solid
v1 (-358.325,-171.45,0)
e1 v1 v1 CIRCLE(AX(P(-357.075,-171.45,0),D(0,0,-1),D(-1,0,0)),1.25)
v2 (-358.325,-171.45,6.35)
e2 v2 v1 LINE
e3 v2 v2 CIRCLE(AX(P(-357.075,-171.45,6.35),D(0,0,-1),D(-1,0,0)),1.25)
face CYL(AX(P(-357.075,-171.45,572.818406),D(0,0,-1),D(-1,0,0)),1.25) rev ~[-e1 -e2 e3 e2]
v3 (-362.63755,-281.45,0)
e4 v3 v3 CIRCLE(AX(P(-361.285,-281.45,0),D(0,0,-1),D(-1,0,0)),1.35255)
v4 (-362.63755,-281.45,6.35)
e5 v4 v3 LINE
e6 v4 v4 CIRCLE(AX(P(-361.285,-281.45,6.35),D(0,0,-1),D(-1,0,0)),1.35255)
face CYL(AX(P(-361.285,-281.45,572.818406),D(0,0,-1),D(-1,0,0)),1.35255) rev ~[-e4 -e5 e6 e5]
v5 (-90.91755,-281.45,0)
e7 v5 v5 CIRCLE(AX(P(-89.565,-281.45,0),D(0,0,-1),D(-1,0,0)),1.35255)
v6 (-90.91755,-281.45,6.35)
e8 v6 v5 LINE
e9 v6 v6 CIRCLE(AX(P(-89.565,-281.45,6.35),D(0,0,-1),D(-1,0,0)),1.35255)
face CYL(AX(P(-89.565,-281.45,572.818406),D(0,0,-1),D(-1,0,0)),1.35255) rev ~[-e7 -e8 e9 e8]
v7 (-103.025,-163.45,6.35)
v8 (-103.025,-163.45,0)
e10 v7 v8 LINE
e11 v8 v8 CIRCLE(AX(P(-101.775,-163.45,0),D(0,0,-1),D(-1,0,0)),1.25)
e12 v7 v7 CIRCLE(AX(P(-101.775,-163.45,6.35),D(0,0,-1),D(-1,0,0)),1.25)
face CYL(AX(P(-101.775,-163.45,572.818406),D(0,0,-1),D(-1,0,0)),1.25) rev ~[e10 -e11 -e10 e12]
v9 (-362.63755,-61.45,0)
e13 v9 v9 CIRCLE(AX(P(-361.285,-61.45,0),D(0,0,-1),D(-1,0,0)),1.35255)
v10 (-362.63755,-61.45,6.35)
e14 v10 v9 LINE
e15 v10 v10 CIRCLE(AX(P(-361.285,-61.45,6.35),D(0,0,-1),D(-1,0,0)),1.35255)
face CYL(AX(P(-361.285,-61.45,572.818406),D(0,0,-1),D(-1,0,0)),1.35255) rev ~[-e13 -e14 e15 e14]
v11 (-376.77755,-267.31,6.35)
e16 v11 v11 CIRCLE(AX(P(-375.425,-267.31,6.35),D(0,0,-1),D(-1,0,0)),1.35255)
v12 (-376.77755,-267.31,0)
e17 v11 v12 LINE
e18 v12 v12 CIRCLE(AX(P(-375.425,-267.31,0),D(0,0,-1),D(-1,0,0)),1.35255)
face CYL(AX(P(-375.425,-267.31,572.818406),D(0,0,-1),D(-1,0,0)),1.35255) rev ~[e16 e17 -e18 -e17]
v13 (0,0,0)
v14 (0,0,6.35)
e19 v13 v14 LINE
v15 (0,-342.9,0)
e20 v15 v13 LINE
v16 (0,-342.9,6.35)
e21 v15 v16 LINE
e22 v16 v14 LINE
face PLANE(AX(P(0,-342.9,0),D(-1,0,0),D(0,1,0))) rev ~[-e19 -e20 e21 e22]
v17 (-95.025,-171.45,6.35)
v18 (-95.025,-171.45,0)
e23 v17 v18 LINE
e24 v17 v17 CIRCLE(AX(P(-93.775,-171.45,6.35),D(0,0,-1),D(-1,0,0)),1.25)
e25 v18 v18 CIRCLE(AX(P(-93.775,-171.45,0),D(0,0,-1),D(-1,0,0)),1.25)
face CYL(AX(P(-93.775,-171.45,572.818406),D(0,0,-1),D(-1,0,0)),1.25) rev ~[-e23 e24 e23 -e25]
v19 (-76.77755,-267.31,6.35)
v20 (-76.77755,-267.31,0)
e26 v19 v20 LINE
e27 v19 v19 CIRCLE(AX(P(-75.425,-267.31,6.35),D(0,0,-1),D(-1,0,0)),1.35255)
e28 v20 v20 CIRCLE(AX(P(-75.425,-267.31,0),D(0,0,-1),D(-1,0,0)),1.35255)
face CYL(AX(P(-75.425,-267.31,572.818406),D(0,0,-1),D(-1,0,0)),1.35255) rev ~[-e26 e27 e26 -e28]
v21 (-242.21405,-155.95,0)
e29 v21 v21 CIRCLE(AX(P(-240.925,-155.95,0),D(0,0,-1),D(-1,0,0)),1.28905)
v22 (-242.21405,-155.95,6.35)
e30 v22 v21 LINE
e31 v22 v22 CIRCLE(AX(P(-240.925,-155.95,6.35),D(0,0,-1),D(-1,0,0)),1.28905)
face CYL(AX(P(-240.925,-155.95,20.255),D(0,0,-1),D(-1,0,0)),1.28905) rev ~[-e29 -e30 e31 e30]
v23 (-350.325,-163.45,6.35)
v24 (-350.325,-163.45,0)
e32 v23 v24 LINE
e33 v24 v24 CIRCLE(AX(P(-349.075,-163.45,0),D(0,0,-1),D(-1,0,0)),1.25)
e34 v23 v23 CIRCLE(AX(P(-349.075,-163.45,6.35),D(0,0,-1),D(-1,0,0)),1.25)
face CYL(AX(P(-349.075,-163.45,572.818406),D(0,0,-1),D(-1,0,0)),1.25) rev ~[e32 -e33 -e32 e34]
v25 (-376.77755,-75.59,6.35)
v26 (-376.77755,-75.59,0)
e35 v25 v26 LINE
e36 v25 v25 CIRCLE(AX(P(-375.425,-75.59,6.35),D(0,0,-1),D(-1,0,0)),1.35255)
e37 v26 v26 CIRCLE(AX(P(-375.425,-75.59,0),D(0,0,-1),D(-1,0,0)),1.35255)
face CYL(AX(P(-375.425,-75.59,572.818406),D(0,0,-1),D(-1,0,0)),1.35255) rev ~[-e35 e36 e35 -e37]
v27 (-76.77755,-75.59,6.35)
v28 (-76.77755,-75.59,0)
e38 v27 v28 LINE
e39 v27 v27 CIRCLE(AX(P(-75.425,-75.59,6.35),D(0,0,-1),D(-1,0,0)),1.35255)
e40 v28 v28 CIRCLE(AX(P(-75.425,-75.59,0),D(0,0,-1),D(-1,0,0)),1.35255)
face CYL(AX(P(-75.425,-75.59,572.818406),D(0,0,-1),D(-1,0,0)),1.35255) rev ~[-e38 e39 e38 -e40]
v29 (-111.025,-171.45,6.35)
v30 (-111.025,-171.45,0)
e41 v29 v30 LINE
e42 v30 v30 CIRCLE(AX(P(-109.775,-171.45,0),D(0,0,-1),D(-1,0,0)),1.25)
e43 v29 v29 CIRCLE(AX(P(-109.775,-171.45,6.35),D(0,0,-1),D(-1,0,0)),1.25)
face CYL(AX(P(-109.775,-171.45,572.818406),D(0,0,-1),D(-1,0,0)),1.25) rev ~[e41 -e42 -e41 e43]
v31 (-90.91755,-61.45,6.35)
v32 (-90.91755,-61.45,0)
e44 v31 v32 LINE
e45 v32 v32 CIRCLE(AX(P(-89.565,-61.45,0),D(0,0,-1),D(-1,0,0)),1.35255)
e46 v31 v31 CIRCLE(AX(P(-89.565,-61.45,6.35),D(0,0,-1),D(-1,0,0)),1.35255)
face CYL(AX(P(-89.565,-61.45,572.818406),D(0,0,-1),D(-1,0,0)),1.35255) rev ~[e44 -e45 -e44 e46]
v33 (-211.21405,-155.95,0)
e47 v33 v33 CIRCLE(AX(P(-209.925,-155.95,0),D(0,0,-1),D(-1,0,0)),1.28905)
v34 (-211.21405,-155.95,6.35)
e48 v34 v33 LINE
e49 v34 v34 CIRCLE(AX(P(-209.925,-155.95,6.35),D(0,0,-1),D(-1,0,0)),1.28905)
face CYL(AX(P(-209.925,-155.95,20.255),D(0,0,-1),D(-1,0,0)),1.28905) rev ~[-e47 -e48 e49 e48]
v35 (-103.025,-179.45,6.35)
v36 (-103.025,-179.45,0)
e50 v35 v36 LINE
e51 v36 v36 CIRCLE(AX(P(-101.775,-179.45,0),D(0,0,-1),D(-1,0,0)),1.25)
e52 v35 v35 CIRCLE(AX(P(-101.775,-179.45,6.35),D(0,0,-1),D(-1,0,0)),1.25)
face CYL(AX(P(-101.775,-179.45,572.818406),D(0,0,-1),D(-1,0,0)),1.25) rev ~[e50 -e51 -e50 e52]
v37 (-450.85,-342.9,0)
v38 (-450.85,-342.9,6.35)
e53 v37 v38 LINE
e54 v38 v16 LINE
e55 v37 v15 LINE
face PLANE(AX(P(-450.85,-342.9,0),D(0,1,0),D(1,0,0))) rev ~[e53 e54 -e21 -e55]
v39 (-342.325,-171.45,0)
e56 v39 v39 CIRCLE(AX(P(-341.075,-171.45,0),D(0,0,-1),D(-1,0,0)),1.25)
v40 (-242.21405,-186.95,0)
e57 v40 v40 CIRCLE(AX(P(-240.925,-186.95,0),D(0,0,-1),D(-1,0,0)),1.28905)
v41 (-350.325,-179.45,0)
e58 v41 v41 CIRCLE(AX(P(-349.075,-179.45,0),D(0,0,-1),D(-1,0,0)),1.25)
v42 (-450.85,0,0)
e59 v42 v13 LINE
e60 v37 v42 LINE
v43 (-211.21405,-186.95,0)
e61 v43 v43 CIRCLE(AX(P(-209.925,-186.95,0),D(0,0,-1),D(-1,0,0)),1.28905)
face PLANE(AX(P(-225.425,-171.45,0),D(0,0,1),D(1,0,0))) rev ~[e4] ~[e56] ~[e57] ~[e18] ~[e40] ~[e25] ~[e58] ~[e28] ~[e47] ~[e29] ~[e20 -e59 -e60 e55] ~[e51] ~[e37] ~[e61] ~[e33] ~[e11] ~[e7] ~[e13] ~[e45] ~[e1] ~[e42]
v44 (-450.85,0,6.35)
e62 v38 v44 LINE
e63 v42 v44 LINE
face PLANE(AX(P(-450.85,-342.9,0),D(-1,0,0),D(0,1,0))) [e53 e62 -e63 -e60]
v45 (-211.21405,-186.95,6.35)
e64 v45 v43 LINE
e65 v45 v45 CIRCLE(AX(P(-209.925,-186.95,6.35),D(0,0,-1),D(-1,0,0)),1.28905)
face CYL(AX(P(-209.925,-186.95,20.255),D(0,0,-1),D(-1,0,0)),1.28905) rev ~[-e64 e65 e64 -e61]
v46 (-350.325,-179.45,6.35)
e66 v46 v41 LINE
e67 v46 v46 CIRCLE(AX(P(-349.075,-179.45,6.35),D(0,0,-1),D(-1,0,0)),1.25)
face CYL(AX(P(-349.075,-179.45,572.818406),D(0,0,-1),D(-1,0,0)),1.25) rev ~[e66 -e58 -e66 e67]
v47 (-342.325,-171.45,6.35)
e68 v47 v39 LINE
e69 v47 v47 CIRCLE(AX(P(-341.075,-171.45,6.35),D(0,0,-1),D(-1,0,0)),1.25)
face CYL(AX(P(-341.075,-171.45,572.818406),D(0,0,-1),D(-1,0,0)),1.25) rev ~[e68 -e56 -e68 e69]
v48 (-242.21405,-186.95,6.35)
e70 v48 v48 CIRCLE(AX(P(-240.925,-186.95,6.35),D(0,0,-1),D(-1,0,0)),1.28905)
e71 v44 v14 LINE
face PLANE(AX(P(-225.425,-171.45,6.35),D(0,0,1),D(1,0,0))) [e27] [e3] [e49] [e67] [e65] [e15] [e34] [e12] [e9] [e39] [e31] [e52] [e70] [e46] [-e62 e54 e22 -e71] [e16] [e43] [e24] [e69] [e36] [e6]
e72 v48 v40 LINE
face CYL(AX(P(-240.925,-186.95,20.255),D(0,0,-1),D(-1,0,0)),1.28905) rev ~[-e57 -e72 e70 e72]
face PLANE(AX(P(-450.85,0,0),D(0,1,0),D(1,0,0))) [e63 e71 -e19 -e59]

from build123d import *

# Parameters (mm, degrees)
F0_W     = 450.85
F0_H     = 342.9
F1_DEPTH = 6.35
F3_D     = 2.5781
F3_DEPTH = 13.905
F3_TIP   = 0.774539381
F4_D     = 2.5
F5_D     = 2.5
F6_D     = 2.7051
F7_D     = 2.7051


# Not quite as in the source:
# - a feature names something its author has since deleted; it is built from what else it names


with BuildPart() as f1:
    # F0 (on Top) → F1 (new body)
    with BuildSketch(Plane.XY):
        with Locations((-225.425, -171.45)):
            Rectangle(F0_W, F0_H)
    extrude(amount=F1_DEPTH)

    # F3
    with Locations(Plane.XY.offset(6.35)):
        with Locations((-240.925, -155.95), (-209.925, -155.95), (-209.925, -186.95), (-240.925, -186.95)):
            Hole(F3_D / 2, depth=F3_DEPTH)
            with Locations((0, 0, -(F3_DEPTH + F3_TIP / 2))):  # 118° drill point
                Cone(0, F3_D / 2, F3_TIP, mode=Mode.SUBTRACT)

    # F4 (through all)
    with Locations(Plane.XY.offset(6.35)):
        with Locations((-341.075, -171.45), (-357.075, -171.45), (-349.075, -163.45), (-349.075, -179.45)):
            Hole(F4_D / 2)

    # F5 (through all)
    with Locations(Plane.XY.offset(6.35)):
        with Locations((-101.775, -163.45), (-109.775, -171.45), (-101.775, -179.45), (-93.775, -171.45)):
            Hole(F5_D / 2)

    # F6 (through all)
    with Locations(Plane.XY.offset(6.35)):
        with Locations((-361.285, -281.45), (-375.425, -267.31), (-89.565, -281.45), (-75.425, -267.31)):
            Hole(F6_D / 2)

    # F7 (through all)
    with Locations(Plane.XY.offset(6.35)):
        with Locations((-361.285, -61.45), (-375.425, -75.59), (-89.565, -61.45), (-75.425, -75.59)):
            Hole(F7_D / 2)


solid = f1.part
